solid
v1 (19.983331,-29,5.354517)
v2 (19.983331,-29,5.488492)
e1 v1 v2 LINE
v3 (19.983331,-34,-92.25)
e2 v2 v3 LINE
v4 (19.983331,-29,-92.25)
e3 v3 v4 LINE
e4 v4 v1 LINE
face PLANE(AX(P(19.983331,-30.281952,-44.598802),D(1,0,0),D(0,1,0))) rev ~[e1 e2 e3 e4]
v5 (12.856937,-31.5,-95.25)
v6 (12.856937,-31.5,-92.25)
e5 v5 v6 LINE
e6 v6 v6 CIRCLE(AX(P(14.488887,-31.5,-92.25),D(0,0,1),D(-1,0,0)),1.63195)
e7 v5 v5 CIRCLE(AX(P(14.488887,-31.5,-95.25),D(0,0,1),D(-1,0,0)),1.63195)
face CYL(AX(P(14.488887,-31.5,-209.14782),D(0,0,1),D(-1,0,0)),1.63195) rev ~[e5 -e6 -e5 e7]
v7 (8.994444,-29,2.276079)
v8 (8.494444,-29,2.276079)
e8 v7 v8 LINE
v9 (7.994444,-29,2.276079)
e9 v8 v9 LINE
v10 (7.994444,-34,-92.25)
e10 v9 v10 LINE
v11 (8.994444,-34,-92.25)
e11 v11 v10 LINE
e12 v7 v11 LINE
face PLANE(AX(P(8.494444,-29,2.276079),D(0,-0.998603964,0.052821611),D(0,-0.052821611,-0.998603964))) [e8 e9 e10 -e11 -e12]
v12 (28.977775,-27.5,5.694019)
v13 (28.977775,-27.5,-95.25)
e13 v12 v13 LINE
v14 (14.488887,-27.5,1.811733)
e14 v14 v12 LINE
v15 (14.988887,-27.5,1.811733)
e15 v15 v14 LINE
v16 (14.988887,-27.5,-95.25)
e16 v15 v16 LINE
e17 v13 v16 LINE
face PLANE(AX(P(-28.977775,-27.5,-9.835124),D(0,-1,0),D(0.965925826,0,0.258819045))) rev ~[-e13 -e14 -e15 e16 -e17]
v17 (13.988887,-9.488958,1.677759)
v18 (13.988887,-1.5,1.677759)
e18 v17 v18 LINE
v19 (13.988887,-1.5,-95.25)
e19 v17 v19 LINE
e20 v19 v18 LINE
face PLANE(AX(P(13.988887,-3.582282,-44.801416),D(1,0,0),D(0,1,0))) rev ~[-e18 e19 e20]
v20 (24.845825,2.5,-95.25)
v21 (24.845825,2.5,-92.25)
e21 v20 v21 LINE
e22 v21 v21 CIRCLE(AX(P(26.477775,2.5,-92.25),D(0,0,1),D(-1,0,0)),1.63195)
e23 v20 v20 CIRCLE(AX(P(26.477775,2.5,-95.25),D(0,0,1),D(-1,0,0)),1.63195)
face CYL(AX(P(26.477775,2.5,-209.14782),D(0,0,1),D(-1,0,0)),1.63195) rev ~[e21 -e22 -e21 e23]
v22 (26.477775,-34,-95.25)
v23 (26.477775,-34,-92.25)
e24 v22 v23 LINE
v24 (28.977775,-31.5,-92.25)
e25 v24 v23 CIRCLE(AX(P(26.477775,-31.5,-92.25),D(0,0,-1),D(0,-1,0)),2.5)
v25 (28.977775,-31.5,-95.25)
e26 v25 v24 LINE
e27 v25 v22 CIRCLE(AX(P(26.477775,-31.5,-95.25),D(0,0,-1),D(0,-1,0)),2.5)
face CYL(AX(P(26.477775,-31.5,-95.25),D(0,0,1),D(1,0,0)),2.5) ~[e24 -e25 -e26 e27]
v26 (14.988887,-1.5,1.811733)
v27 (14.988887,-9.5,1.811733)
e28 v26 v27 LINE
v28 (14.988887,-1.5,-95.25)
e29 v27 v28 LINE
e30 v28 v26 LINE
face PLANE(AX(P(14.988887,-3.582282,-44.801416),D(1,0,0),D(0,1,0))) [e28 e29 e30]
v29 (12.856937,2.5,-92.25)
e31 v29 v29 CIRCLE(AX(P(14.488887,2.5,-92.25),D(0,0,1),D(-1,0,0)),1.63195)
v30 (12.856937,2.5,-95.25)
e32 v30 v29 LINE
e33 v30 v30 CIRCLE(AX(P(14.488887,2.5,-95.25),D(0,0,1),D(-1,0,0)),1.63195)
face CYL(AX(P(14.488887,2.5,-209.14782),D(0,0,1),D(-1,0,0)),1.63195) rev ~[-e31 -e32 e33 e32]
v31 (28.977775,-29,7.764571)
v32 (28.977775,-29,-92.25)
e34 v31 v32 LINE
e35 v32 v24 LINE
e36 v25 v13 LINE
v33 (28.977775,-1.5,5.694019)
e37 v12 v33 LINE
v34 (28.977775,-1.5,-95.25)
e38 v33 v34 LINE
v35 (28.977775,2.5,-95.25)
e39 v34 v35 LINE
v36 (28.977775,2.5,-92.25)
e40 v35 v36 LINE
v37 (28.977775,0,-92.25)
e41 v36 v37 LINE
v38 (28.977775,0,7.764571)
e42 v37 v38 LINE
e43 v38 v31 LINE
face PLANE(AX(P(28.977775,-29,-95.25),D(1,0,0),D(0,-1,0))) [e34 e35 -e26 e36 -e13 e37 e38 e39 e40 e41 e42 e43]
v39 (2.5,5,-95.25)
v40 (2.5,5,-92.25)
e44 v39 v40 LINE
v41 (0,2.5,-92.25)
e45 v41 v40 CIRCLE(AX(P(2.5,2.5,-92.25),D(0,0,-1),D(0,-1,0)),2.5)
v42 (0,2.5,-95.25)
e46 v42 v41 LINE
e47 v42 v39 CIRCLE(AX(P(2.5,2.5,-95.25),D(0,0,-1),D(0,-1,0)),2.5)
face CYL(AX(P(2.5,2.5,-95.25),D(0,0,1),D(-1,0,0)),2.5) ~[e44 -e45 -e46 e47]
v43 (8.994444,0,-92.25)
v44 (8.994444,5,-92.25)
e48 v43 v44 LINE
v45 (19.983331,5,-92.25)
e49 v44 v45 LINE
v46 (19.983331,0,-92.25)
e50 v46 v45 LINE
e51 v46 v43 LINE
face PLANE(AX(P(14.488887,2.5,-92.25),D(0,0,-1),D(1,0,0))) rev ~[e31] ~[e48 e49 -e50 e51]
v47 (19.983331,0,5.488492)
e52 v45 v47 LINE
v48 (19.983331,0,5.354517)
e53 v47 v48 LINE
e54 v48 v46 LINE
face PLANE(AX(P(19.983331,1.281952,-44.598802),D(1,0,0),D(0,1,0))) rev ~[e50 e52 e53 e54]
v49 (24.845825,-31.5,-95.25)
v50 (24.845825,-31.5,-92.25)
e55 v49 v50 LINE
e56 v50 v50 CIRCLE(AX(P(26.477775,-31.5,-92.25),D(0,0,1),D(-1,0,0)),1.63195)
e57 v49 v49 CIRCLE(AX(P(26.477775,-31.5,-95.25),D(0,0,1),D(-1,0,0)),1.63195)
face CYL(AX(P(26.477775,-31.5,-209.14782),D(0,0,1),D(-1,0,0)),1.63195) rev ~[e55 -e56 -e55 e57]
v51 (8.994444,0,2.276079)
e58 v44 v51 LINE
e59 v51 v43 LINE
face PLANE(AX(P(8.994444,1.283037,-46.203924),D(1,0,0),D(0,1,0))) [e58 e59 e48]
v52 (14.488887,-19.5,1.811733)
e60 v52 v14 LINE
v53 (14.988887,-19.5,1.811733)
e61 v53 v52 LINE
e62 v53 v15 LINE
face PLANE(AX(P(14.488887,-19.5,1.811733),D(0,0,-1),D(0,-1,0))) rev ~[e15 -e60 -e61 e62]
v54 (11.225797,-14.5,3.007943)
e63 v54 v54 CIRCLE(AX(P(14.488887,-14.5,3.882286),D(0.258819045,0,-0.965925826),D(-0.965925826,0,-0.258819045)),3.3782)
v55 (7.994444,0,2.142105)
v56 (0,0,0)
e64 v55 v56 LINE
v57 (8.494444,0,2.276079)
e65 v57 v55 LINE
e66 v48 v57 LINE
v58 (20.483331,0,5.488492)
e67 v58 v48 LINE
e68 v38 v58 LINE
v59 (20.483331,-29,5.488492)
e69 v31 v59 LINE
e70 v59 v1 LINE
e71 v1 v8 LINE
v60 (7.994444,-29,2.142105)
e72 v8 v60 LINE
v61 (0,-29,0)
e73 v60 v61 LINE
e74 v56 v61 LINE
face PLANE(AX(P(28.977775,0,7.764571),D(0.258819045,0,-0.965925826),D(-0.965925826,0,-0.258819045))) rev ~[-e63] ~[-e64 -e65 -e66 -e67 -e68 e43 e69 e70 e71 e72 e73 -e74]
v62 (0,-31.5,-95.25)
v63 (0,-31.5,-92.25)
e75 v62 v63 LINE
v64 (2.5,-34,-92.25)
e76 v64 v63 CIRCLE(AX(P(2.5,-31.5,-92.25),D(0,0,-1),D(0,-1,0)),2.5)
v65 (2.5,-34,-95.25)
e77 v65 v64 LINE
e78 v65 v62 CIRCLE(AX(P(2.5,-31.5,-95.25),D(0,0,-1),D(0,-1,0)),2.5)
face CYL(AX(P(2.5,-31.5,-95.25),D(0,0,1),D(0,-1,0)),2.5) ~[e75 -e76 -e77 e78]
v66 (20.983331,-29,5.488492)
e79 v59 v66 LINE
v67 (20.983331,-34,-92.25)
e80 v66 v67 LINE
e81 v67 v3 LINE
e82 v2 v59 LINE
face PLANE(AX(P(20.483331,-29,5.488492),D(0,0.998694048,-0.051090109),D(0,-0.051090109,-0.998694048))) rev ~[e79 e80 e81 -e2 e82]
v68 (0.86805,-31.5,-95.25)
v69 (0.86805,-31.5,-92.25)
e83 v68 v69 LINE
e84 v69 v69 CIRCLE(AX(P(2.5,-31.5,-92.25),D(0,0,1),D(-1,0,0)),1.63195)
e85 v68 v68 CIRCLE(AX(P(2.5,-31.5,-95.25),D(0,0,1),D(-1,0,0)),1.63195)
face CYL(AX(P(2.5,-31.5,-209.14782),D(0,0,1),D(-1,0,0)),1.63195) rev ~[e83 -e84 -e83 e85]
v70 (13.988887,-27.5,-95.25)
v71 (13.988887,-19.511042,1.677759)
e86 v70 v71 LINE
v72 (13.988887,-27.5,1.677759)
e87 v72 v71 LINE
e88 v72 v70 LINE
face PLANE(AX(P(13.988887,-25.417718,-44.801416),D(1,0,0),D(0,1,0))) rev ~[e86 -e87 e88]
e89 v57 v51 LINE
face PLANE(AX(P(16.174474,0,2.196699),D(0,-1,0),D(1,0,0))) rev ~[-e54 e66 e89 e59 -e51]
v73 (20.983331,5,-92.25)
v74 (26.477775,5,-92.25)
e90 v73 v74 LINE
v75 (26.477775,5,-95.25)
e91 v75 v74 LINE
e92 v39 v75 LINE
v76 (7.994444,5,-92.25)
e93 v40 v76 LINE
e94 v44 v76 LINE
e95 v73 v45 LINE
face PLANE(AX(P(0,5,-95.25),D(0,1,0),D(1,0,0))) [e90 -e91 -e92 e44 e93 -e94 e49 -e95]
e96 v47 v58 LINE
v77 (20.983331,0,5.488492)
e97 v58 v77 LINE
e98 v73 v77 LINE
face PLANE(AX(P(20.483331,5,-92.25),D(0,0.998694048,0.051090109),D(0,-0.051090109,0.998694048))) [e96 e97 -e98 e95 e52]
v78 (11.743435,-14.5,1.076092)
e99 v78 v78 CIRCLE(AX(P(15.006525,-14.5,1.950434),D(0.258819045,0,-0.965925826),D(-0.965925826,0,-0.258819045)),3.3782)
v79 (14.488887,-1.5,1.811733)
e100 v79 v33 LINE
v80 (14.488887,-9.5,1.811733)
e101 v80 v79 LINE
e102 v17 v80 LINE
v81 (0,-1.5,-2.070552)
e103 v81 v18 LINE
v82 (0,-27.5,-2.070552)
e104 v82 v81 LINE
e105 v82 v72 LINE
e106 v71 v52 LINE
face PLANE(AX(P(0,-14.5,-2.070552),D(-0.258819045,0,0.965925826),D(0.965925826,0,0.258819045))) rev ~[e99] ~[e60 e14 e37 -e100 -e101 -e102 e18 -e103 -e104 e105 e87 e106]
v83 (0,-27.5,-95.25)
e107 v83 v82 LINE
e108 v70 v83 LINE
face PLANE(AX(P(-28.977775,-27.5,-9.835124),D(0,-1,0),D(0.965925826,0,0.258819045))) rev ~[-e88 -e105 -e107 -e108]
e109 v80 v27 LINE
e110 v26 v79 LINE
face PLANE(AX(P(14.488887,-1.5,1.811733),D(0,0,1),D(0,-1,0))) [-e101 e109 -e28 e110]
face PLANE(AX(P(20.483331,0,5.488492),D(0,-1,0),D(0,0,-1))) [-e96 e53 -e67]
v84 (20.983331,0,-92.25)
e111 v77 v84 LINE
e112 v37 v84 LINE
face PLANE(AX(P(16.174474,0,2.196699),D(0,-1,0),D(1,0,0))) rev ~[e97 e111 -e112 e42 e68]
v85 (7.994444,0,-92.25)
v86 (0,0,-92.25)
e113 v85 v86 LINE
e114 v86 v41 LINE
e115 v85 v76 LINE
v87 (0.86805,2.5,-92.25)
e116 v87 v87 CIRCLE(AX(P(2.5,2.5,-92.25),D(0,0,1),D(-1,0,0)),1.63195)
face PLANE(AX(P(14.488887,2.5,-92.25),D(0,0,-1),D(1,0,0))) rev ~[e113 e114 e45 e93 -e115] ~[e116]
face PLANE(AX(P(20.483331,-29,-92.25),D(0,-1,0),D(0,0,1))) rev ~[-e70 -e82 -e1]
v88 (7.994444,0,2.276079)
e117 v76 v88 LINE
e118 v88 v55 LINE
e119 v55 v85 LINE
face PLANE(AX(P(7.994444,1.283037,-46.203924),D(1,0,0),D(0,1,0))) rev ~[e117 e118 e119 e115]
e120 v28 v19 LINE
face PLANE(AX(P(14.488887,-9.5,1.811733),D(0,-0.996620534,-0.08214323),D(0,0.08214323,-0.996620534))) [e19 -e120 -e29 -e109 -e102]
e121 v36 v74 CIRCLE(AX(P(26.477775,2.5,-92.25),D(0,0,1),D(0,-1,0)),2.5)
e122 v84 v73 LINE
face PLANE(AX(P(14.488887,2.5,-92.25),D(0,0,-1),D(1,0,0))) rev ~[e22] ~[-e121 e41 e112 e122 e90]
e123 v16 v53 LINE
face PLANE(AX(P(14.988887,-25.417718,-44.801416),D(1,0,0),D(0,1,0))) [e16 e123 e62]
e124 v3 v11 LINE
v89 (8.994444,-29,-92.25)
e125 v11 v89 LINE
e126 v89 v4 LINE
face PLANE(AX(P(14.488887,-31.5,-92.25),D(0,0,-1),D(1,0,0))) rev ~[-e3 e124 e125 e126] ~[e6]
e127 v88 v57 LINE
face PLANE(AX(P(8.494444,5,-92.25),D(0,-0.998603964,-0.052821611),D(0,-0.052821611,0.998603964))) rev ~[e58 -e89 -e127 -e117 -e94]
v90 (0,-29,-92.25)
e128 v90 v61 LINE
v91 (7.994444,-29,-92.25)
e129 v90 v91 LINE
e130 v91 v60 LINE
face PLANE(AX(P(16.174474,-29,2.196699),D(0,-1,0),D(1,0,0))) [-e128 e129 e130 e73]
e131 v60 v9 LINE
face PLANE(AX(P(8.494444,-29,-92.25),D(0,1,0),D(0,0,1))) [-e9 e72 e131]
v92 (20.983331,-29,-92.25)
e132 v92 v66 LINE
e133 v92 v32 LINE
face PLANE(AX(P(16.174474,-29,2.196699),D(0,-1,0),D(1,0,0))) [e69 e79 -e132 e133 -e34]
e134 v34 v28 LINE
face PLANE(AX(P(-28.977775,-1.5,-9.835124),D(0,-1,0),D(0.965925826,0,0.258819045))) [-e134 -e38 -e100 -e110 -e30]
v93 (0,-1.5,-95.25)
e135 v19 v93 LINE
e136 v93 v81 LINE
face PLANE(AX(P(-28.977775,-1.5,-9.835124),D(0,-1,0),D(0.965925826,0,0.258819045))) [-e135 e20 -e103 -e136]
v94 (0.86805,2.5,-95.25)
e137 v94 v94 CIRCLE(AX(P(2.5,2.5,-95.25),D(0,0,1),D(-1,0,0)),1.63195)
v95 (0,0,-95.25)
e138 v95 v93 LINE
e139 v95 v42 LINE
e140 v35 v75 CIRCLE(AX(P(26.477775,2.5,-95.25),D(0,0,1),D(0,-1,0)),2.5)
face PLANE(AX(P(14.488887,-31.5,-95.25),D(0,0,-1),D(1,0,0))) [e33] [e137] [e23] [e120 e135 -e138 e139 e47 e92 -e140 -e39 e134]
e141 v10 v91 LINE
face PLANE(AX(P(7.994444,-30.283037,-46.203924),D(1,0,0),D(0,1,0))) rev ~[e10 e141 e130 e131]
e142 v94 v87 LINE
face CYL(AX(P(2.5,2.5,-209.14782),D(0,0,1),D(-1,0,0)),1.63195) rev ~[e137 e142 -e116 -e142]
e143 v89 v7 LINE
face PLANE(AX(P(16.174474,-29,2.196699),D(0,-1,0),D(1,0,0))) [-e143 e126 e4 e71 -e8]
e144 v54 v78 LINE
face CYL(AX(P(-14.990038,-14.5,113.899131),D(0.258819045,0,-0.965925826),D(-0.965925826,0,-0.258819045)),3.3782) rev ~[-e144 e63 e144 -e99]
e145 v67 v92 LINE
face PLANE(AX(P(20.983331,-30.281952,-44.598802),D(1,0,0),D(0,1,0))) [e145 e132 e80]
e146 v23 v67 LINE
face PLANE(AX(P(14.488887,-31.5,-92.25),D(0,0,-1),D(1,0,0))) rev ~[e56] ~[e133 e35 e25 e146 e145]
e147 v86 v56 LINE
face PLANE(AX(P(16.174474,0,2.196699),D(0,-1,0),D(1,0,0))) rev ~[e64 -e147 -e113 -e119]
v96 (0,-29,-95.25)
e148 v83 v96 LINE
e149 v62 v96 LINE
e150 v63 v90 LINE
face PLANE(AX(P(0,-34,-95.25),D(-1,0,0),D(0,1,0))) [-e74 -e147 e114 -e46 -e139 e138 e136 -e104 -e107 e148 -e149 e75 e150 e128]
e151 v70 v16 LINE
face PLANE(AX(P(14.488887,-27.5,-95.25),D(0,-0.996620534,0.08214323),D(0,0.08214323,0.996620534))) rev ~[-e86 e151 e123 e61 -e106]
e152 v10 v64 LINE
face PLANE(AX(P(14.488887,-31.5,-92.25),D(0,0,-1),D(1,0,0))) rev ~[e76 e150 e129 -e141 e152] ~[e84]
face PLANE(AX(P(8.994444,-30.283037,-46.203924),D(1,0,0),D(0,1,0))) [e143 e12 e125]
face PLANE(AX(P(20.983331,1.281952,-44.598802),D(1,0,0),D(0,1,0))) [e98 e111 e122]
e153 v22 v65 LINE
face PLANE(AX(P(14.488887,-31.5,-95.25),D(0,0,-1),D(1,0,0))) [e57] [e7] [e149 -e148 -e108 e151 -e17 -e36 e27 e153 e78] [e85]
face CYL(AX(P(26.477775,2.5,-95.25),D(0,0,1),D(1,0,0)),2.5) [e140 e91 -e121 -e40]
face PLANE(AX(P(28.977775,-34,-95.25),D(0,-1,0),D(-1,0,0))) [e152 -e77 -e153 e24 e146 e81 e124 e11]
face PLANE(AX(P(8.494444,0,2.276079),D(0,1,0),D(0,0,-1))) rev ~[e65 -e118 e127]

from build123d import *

# Parameters (mm, degrees)
F1_DEPTH  = 29
F0_W      = 28.9777747887
F0_H      = 95.25
F2_DEPTH  = 29
F5_DEPTH  = 3
F6_R      = 2.5
F7_D      = 3.2639
F10_R     = 2.5
F9_W      = 60
F9_H      = 26
F11_DEPTH = 97.505434954
F16_DEPTH = 0.5
F19_DEPTH = 0.5
F22_DEPTH = 0.5
F23_D     = 6.7564


# Not quite as in the source:
# - a feature names something its author has since deleted; it is built from what else it names


with BuildPart() as f1:
    # F0 (on Front) → F1 (new body)
    with BuildSketch(Plane.XZ):
        Polygon((28.9777747887, 7.7645713531), (0, 0), (28.9777747887, 0), align=None)
    extrude(amount=F1_DEPTH)

    # F0 (on Front) → F2 (join)
    with BuildSketch(Plane.XZ):
        Polygon((28.9777747887, 7.7645713531), (0, 0), (28.9777747887, 0), align=None)
        with Locations((14.4888873943, -47.625)):
            Rectangle(F0_W, F0_H)
    extrude(amount=F2_DEPTH)

    # F4 (on face) → F5 (join)
    with BuildSketch(Plane(origin=(0, 0, -95.25), x_dir=(1, 0, 0), z_dir=(0, 0, -1))):
        Polygon((0, 29), (14.4888873943, 29), (28.9777747887, 29), (28.9777747887, 34), (0, 34), align=None)
        Polygon((28.9777747887, 0), (14.4888873943, 0), (0, 0), (0, -5), (28.9777747887, -5), align=None)
    extrude(amount=-F5_DEPTH)

    # F6
    f6_edges = [f1.edges().sort_by_distance(p)[0] for p in [
        (28.977775, -34, -93.75),
        (0, -34, -93.75),
    ]]
    fillet(f6_edges, radius=F6_R)

    # F7 (through all)
    with Locations(Plane(origin=(0, 0, -95.25), x_dir=(1, 0, 0), z_dir=(0, 0, -1))):
        with Locations((2.5, 31.5), (14.4888873943, 31.5), (26.4777747887, 31.5), (2.5, -2.5), (14.4888873943, -2.5), (26.4777747887, -2.5)):
            Hole(F7_D / 2)

    # F10
    f10_edges = [f1.edges().sort_by_distance(p)[0] for p in [
        (28.977775, 5, -93.75),
        (0, 5, -93.75),
    ]]
    fillet(f10_edges, radius=F10_R)

    # F9 (on offset) → F11 (cut, through all)
    with BuildSketch(Plane(origin=(0.5176380902, 0, -1.9318516526), x_dir=(0.9659258263, 0, 0.2588190451), z_dir=(-0.2588190451, 0, 0.9659258263))):
        with Locations((-0.5358983849, -14.5)):
            Rectangle(F9_W, F9_H)
    extrude(amount=-F11_DEPTH, mode=Mode.SUBTRACT)

    # F15 (on plane+point) → F16 (join, symmetric)
    with BuildSketch(Plane.YZ.offset(20.4833310915)):
        Polygon((-29, -92.25), (-29, 5.4884920243), (-34, -92.25), align=None)
        Polygon((5, -92.25), (0, 5.4884920243), (0, -92.25), align=None)
    extrude(amount=F16_DEPTH, both=True)

    # F18 (on plane+point) → F19 (join, symmetric)
    with BuildSketch(Plane.YZ.offset(8.4944436972)):
        Polygon((5, -92.25), (0, 2.2760793288), (0, -92.25), align=None)
        Polygon((-34, -92.25), (-29, -92.25), (-29, 2.2760793288), align=None)
    extrude(amount=F19_DEPTH, both=True)

    # F21 (on plane+point) → F22 (join, symmetric)
    with BuildSketch(Plane.YZ.offset(14.4888873943)):
        Polygon((-27.5, 1.8117333157), (-27.5, -95.25), (-19.5, 1.8117333157), align=None)
        Polygon((-1.5, 1.8117333157), (-9.5, 1.8117333157), (-1.5, -95.25), align=None)
    extrude(amount=F22_DEPTH, both=True)

    # F23 (through all)
    with Locations(Plane(origin=(0, 0, 0), x_dir=(0.9659258263, 0, 0.2588190451), z_dir=(-0.2588190451, 0, 0.9659258263))):
        with Locations((15, -14.5)):
            Hole(F23_D / 2)


solid = f1.part
